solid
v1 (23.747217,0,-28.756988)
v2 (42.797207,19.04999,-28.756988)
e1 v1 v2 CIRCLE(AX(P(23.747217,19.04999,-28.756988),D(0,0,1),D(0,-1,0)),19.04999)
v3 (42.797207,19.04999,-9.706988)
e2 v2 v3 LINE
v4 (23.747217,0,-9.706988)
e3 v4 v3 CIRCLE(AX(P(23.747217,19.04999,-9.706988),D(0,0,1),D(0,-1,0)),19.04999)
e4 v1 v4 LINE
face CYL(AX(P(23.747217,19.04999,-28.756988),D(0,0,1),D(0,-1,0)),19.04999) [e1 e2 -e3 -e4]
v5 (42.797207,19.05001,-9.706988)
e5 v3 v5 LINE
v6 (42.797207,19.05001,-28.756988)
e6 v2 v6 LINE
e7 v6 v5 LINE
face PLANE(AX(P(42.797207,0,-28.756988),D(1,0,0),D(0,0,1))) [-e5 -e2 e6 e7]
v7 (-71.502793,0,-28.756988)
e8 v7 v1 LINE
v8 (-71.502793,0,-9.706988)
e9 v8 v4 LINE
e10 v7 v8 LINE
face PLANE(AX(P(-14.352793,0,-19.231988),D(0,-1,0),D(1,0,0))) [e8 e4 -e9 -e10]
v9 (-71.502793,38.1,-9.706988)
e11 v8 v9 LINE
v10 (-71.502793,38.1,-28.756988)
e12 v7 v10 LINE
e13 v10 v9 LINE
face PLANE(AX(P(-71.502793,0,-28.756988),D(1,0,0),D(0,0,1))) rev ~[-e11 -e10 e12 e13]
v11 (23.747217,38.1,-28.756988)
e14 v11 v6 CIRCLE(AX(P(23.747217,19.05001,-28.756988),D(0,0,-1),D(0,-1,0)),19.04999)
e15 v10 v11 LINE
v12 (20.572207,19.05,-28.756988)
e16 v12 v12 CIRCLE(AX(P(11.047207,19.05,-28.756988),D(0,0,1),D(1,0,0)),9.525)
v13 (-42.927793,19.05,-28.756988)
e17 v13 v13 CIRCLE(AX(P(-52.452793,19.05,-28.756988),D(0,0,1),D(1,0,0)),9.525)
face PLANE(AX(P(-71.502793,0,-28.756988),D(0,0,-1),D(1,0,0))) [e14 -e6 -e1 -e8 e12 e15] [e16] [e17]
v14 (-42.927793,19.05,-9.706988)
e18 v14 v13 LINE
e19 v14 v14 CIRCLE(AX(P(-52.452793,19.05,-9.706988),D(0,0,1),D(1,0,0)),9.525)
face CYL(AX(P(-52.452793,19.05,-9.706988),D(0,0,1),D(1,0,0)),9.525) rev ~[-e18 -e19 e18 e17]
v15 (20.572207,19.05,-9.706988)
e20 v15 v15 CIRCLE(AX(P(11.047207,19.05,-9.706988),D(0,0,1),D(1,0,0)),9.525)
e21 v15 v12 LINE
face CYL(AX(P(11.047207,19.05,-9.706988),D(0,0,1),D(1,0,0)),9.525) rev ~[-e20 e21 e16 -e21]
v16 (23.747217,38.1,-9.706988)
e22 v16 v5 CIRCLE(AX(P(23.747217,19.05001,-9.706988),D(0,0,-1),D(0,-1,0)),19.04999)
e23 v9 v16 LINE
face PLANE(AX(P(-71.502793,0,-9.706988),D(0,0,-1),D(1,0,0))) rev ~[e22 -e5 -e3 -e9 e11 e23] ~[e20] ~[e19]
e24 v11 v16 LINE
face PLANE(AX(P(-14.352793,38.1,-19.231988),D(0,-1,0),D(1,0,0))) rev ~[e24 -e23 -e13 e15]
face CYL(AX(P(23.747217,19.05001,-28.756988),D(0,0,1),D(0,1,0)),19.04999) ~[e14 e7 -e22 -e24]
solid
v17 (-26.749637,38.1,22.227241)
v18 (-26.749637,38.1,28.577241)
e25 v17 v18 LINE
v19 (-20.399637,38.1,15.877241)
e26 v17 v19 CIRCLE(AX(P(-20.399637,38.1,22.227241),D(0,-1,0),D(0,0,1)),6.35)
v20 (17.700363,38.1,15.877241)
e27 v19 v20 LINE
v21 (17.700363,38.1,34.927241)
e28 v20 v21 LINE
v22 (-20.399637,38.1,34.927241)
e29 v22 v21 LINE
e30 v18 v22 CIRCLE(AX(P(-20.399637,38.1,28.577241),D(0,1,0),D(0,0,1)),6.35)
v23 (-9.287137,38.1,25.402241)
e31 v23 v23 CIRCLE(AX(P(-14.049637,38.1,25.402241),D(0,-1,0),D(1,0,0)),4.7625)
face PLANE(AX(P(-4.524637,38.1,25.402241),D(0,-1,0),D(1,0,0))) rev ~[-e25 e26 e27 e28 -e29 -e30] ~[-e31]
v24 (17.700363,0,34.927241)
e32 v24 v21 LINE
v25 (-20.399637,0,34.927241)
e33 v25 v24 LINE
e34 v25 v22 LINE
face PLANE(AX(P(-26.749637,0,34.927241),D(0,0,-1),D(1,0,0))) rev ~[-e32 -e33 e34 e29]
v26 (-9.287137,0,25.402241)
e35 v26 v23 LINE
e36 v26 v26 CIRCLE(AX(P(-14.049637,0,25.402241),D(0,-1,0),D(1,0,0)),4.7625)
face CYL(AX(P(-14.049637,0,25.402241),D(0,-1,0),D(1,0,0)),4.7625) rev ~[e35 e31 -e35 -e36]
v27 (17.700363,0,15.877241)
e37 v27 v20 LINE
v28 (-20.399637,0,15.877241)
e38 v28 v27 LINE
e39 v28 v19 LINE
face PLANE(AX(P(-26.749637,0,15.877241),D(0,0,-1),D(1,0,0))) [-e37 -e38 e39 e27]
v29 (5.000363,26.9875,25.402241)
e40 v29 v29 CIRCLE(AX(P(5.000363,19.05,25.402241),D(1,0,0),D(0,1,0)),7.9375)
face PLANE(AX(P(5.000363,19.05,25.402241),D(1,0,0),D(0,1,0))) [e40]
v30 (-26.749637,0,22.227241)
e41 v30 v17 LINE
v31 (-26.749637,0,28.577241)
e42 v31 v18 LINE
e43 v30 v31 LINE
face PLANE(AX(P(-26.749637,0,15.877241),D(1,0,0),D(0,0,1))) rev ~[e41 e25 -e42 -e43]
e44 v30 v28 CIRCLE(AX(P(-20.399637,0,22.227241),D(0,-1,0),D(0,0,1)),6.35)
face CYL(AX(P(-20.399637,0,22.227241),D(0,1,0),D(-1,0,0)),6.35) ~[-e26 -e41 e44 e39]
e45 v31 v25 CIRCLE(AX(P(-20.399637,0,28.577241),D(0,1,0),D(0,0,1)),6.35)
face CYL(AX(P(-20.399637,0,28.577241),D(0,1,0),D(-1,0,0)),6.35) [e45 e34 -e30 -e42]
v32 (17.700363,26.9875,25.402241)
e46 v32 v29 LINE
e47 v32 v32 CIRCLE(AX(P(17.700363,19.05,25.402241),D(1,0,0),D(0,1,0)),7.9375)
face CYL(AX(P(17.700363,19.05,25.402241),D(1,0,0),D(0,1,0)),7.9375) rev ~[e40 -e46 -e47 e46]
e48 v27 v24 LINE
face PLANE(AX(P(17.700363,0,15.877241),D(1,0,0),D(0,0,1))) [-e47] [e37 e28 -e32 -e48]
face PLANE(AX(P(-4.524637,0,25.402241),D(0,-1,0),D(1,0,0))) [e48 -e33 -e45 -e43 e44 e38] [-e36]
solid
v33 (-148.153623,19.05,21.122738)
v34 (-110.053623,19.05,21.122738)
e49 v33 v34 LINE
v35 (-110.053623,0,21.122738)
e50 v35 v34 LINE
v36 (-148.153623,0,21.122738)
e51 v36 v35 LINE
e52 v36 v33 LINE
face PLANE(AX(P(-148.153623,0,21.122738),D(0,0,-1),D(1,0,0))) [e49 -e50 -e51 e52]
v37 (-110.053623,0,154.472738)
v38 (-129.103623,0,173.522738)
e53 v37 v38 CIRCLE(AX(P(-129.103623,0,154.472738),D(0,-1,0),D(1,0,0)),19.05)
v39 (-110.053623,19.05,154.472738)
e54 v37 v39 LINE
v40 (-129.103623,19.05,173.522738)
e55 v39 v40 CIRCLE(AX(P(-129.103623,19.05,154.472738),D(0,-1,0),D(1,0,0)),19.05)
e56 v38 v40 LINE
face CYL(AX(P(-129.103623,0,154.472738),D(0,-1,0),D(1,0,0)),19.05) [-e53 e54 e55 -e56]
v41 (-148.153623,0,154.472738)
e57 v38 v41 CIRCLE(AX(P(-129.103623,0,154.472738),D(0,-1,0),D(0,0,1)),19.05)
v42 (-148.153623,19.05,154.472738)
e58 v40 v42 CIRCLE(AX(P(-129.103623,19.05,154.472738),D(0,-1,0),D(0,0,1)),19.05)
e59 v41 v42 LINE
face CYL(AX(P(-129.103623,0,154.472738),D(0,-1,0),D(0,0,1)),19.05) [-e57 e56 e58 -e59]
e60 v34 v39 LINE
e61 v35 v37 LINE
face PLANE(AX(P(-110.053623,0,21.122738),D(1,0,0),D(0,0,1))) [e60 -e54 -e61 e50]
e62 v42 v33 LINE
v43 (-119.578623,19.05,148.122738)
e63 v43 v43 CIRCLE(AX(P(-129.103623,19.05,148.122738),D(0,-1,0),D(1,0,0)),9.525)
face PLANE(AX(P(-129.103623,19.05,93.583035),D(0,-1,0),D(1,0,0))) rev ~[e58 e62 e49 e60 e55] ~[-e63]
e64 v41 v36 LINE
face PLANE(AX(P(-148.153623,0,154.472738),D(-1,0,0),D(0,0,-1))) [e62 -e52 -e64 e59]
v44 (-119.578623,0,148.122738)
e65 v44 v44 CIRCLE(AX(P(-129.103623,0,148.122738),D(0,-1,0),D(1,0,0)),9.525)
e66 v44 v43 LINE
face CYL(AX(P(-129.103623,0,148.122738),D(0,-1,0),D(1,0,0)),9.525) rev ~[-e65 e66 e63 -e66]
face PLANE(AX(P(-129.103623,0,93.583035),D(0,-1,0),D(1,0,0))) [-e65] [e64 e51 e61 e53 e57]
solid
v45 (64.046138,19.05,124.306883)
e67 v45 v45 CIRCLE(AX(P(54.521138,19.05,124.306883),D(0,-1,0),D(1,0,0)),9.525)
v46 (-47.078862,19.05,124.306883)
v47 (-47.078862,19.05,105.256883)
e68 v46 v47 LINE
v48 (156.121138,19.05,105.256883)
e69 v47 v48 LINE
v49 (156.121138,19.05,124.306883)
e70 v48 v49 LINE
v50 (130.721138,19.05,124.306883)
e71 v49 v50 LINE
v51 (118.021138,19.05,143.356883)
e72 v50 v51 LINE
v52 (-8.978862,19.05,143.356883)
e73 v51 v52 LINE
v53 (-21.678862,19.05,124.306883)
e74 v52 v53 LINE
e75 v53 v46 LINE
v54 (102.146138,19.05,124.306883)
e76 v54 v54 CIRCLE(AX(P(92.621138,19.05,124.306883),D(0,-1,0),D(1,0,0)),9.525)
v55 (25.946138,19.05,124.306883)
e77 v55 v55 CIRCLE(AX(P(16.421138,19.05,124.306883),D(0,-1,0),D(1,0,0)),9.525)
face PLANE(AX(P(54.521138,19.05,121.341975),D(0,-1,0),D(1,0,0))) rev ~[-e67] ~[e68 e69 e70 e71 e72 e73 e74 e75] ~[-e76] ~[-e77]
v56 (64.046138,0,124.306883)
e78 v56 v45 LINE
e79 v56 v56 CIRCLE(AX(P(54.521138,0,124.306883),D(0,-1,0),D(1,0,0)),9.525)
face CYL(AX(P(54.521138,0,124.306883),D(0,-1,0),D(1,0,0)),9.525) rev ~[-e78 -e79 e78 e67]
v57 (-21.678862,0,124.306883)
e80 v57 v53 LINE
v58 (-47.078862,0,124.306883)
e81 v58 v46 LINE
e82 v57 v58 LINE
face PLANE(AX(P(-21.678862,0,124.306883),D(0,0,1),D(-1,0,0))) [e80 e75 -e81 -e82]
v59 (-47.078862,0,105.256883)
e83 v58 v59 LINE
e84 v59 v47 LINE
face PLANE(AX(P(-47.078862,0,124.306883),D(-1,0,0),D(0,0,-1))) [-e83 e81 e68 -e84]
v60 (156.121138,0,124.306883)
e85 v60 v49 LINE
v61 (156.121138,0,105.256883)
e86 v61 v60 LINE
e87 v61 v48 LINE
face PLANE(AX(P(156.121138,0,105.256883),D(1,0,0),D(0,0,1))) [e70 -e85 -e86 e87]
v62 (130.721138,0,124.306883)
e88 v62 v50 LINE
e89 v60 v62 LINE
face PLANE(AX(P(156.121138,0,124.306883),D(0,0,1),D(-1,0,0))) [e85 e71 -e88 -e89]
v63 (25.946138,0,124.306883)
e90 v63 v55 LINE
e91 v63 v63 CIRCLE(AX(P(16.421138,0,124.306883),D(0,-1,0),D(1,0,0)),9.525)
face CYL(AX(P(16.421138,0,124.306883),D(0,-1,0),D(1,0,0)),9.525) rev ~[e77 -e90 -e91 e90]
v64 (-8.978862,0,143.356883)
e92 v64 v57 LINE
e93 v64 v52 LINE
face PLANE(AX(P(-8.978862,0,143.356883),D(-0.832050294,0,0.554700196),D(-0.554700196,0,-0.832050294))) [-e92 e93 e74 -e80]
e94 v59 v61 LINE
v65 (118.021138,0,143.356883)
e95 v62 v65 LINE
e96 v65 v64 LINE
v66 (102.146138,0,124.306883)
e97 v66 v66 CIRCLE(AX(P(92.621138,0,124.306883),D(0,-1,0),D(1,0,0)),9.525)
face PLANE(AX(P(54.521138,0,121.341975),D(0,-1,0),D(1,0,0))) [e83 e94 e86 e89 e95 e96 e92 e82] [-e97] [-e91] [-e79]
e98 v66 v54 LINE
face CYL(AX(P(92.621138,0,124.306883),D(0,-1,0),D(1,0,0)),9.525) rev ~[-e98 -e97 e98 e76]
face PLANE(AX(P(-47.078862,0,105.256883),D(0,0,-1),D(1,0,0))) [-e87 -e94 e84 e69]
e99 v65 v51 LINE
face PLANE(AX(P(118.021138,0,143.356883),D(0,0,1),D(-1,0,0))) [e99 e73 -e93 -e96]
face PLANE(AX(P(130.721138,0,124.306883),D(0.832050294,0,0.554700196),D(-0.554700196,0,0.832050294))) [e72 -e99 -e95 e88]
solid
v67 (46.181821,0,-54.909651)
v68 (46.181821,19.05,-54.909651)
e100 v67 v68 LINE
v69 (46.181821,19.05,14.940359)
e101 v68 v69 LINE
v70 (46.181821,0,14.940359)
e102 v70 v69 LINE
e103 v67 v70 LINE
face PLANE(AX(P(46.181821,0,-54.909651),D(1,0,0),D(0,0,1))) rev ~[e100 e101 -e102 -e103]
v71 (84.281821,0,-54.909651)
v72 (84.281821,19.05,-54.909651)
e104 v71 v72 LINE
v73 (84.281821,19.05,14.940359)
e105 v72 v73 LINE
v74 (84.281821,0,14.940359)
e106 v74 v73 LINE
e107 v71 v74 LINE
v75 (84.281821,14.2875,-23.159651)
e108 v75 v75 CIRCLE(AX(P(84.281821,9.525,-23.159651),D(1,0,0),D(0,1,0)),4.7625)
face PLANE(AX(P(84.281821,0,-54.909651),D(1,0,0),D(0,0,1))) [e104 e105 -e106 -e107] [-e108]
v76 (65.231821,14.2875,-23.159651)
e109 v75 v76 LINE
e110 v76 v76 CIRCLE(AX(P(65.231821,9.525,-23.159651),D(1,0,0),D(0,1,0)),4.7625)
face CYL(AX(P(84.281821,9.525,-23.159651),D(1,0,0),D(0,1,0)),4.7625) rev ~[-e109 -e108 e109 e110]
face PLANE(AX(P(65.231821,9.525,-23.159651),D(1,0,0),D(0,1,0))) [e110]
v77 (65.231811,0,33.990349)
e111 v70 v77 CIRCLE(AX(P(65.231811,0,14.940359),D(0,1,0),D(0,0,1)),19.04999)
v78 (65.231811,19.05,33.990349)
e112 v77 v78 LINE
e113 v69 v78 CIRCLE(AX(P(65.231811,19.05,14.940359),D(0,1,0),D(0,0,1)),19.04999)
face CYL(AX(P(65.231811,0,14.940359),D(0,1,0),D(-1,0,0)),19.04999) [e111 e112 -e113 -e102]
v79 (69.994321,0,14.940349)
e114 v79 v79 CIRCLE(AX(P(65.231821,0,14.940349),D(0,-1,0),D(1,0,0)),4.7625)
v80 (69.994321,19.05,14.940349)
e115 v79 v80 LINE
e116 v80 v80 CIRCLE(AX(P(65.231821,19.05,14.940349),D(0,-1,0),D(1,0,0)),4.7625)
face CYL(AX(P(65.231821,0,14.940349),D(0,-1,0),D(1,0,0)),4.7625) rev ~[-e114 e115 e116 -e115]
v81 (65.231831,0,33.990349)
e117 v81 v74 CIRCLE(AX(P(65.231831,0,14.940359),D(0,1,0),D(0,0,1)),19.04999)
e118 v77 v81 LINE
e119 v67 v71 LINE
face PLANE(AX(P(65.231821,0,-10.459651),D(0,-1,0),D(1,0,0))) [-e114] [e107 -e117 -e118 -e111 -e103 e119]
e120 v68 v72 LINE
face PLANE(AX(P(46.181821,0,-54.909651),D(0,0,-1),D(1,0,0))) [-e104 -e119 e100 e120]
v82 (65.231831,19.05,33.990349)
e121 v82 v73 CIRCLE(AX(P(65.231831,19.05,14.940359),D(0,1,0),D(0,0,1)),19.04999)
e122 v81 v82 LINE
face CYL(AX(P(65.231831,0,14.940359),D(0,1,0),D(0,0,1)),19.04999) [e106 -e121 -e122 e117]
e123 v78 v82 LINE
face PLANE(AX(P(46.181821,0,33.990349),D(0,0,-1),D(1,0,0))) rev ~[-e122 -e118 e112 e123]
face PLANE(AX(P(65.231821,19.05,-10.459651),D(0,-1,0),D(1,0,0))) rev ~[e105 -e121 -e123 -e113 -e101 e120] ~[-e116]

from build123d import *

# Parameters (mm, degrees)
F0_W      = 44.45
F0_H      = 19.05
F1_DEPTH  = 38.1
F2_R      = 4.7625
F3_DEPTH  = 118.58277
F4_R      = 7.9375
F5_DEPTH  = 12.7
F6_R      = 6.35
F7_W      = 38.1
F7_H      = 88.9
F7_R      = 4.7625
F8_DEPTH  = 19.05
F9_R      = 4.7625
F10_DEPTH = 19.05
F11_R     = 19.04999
F12_W     = 114.3
F12_H     = 19.05
F13_DEPTH = 38.1
F14_R     = 9.525
F15_DEPTH = 43.37852
F16_R     = 19.04999
F17_R     = 9.525
F18_DEPTH = 19.05
F19_R     = 9.525
F20_DEPTH = 19.05


# Not quite as in the source:
# - a fillet or chamfer is up to 0.001 mm smaller than in the source, because OpenCascade refuses the exact size


with BuildPart() as f1:
    # F0 (on Front) → F1 (new body)
    with BuildSketch(Plane.XZ):
        with Locations((-4.5246369214, 25.4022409208)):
            Rectangle(F0_W, F0_H)
    extrude(amount=-F1_DEPTH)

    # F2 (on face) → F3 (cut)
    with BuildSketch(Plane.XZ):
        with Locations((-14.0496369214, 25.4022409208)):
            Circle(F2_R)
    extrude(amount=-F3_DEPTH, mode=Mode.SUBTRACT)

    # F4 (on face) → F5 (cut)
    with BuildSketch(Plane.YZ.offset(17.7003630786)):
        with Locations((19.05, 25.4022409208)):
            Circle(F4_R)
    extrude(amount=-F5_DEPTH, mode=Mode.SUBTRACT)

    # F6
    f6_edges = [f1.edges().sort_by_distance(p)[0] for p in [
        (-26.749637, 19.05, 34.927241),
        (-26.749637, 19.05, 15.877241),
    ]]
    fillet(f6_edges, radius=F6_R)


with BuildPart() as f8:
    # F7 (on Front) → F8 (new body)
    with BuildSketch(Plane.XZ):
        with Locations((65.2318205684, -10.4596508645)):
            Rectangle(F7_W, F7_H)
        with Locations((65.2318205684, 14.9403491355)):
            Circle(F7_R, mode=Mode.SUBTRACT)
    extrude(amount=-F8_DEPTH)

    # F9 (on face) → F10 (cut)
    with BuildSketch(Plane.YZ.offset(84.2818205684)):
        with Locations((9.525, -23.1596508645)):
            Circle(F9_R)
    extrude(amount=-F10_DEPTH, mode=Mode.SUBTRACT)

    # F11 (radius 19.05 in the source; OpenCascade refuses exactly that, so slightly less here)
    f11_edges = [f8.edges().sort_by_distance(p)[0] for p in [
        (84.281821, 9.525, 33.990349),
        (46.181821, 9.525, 33.990349),
    ]]
    fillet(f11_edges, radius=F11_R)


with BuildPart() as f13:
    # F12 (on Front) → F13 (new body)
    with BuildSketch(Plane.XZ):
        with Locations((-14.3527926165, -19.2319881171)):
            Rectangle(F12_W, F12_H)
    extrude(amount=-F13_DEPTH)

    # F14 (on face) → F15 (cut)
    with BuildSketch(Plane.XY.offset(-9.7069881171)):
        with Locations((-52.4527926165, 19.05)):
            Circle(F14_R)
        with Locations((11.0472073835, 19.05)):
            Circle(F14_R)
    extrude(amount=-F15_DEPTH, mode=Mode.SUBTRACT)

    # F16 (radius 19.05 in the source; OpenCascade refuses exactly that, so slightly less here)
    f16_edges = [f13.edges().sort_by_distance(p)[0] for p in [
        (42.797207, 38.1, -19.231988),
        (42.797207, 0, -19.231988),
    ]]
    fillet(f16_edges, radius=F16_R)


with BuildPart() as f18:
    # F17 (on Front) → F18 (new body)
    with BuildSketch(Plane.XZ):
        with BuildLine():
            Line((-148.1536233306, 154.4727383056), (-148.1536233306, 21.1227383056))
            Line((-148.1536233306, 21.1227383056), (-110.0536233306, 21.1227383056))
            Line((-110.0536233306, 21.1227383056), (-110.0536233306, 154.4727383056))
            ThreePointArc((-110.0536233306, 154.4727383056), (-115.633239149, 167.9431224872), (-129.1036233306, 173.5227383056))
            ThreePointArc((-129.1036233306, 173.5227383056), (-142.5740075122, 167.9431224872), (-148.1536233306, 154.4727383056))
        make_face()
        with Locations((-129.1036233306, 148.1227383056)):
            Circle(F17_R, mode=Mode.SUBTRACT)
    extrude(amount=-F18_DEPTH)


with BuildPart() as f20:
    # F19 (on Front) → F20 (new body)
    with BuildSketch(Plane.XZ):
        Polygon((118.0211378485, 143.3568834615), (-8.9788621515, 143.3568834615), (-21.6788621515, 124.3068834615), (-47.0788621515, 124.3068834615), (-47.0788621515, 105.2568834615), (156.1211378485, 105.2568834615), (156.1211378485, 124.3068834615), (130.7211378485, 124.3068834615), align=None)
        with Locations((16.4211378485, 124.3068834615)):
            Circle(F19_R, mode=Mode.SUBTRACT)
        with Locations((54.5211378485, 124.3068834615)):
            Circle(F19_R, mode=Mode.SUBTRACT)
        with Locations((92.6211378485, 124.3068834615)):
            Circle(F19_R, mode=Mode.SUBTRACT)
    extrude(amount=-F20_DEPTH)


solid = Compound([f1.part, f8.part, f13.part, f18.part, f20.part])
